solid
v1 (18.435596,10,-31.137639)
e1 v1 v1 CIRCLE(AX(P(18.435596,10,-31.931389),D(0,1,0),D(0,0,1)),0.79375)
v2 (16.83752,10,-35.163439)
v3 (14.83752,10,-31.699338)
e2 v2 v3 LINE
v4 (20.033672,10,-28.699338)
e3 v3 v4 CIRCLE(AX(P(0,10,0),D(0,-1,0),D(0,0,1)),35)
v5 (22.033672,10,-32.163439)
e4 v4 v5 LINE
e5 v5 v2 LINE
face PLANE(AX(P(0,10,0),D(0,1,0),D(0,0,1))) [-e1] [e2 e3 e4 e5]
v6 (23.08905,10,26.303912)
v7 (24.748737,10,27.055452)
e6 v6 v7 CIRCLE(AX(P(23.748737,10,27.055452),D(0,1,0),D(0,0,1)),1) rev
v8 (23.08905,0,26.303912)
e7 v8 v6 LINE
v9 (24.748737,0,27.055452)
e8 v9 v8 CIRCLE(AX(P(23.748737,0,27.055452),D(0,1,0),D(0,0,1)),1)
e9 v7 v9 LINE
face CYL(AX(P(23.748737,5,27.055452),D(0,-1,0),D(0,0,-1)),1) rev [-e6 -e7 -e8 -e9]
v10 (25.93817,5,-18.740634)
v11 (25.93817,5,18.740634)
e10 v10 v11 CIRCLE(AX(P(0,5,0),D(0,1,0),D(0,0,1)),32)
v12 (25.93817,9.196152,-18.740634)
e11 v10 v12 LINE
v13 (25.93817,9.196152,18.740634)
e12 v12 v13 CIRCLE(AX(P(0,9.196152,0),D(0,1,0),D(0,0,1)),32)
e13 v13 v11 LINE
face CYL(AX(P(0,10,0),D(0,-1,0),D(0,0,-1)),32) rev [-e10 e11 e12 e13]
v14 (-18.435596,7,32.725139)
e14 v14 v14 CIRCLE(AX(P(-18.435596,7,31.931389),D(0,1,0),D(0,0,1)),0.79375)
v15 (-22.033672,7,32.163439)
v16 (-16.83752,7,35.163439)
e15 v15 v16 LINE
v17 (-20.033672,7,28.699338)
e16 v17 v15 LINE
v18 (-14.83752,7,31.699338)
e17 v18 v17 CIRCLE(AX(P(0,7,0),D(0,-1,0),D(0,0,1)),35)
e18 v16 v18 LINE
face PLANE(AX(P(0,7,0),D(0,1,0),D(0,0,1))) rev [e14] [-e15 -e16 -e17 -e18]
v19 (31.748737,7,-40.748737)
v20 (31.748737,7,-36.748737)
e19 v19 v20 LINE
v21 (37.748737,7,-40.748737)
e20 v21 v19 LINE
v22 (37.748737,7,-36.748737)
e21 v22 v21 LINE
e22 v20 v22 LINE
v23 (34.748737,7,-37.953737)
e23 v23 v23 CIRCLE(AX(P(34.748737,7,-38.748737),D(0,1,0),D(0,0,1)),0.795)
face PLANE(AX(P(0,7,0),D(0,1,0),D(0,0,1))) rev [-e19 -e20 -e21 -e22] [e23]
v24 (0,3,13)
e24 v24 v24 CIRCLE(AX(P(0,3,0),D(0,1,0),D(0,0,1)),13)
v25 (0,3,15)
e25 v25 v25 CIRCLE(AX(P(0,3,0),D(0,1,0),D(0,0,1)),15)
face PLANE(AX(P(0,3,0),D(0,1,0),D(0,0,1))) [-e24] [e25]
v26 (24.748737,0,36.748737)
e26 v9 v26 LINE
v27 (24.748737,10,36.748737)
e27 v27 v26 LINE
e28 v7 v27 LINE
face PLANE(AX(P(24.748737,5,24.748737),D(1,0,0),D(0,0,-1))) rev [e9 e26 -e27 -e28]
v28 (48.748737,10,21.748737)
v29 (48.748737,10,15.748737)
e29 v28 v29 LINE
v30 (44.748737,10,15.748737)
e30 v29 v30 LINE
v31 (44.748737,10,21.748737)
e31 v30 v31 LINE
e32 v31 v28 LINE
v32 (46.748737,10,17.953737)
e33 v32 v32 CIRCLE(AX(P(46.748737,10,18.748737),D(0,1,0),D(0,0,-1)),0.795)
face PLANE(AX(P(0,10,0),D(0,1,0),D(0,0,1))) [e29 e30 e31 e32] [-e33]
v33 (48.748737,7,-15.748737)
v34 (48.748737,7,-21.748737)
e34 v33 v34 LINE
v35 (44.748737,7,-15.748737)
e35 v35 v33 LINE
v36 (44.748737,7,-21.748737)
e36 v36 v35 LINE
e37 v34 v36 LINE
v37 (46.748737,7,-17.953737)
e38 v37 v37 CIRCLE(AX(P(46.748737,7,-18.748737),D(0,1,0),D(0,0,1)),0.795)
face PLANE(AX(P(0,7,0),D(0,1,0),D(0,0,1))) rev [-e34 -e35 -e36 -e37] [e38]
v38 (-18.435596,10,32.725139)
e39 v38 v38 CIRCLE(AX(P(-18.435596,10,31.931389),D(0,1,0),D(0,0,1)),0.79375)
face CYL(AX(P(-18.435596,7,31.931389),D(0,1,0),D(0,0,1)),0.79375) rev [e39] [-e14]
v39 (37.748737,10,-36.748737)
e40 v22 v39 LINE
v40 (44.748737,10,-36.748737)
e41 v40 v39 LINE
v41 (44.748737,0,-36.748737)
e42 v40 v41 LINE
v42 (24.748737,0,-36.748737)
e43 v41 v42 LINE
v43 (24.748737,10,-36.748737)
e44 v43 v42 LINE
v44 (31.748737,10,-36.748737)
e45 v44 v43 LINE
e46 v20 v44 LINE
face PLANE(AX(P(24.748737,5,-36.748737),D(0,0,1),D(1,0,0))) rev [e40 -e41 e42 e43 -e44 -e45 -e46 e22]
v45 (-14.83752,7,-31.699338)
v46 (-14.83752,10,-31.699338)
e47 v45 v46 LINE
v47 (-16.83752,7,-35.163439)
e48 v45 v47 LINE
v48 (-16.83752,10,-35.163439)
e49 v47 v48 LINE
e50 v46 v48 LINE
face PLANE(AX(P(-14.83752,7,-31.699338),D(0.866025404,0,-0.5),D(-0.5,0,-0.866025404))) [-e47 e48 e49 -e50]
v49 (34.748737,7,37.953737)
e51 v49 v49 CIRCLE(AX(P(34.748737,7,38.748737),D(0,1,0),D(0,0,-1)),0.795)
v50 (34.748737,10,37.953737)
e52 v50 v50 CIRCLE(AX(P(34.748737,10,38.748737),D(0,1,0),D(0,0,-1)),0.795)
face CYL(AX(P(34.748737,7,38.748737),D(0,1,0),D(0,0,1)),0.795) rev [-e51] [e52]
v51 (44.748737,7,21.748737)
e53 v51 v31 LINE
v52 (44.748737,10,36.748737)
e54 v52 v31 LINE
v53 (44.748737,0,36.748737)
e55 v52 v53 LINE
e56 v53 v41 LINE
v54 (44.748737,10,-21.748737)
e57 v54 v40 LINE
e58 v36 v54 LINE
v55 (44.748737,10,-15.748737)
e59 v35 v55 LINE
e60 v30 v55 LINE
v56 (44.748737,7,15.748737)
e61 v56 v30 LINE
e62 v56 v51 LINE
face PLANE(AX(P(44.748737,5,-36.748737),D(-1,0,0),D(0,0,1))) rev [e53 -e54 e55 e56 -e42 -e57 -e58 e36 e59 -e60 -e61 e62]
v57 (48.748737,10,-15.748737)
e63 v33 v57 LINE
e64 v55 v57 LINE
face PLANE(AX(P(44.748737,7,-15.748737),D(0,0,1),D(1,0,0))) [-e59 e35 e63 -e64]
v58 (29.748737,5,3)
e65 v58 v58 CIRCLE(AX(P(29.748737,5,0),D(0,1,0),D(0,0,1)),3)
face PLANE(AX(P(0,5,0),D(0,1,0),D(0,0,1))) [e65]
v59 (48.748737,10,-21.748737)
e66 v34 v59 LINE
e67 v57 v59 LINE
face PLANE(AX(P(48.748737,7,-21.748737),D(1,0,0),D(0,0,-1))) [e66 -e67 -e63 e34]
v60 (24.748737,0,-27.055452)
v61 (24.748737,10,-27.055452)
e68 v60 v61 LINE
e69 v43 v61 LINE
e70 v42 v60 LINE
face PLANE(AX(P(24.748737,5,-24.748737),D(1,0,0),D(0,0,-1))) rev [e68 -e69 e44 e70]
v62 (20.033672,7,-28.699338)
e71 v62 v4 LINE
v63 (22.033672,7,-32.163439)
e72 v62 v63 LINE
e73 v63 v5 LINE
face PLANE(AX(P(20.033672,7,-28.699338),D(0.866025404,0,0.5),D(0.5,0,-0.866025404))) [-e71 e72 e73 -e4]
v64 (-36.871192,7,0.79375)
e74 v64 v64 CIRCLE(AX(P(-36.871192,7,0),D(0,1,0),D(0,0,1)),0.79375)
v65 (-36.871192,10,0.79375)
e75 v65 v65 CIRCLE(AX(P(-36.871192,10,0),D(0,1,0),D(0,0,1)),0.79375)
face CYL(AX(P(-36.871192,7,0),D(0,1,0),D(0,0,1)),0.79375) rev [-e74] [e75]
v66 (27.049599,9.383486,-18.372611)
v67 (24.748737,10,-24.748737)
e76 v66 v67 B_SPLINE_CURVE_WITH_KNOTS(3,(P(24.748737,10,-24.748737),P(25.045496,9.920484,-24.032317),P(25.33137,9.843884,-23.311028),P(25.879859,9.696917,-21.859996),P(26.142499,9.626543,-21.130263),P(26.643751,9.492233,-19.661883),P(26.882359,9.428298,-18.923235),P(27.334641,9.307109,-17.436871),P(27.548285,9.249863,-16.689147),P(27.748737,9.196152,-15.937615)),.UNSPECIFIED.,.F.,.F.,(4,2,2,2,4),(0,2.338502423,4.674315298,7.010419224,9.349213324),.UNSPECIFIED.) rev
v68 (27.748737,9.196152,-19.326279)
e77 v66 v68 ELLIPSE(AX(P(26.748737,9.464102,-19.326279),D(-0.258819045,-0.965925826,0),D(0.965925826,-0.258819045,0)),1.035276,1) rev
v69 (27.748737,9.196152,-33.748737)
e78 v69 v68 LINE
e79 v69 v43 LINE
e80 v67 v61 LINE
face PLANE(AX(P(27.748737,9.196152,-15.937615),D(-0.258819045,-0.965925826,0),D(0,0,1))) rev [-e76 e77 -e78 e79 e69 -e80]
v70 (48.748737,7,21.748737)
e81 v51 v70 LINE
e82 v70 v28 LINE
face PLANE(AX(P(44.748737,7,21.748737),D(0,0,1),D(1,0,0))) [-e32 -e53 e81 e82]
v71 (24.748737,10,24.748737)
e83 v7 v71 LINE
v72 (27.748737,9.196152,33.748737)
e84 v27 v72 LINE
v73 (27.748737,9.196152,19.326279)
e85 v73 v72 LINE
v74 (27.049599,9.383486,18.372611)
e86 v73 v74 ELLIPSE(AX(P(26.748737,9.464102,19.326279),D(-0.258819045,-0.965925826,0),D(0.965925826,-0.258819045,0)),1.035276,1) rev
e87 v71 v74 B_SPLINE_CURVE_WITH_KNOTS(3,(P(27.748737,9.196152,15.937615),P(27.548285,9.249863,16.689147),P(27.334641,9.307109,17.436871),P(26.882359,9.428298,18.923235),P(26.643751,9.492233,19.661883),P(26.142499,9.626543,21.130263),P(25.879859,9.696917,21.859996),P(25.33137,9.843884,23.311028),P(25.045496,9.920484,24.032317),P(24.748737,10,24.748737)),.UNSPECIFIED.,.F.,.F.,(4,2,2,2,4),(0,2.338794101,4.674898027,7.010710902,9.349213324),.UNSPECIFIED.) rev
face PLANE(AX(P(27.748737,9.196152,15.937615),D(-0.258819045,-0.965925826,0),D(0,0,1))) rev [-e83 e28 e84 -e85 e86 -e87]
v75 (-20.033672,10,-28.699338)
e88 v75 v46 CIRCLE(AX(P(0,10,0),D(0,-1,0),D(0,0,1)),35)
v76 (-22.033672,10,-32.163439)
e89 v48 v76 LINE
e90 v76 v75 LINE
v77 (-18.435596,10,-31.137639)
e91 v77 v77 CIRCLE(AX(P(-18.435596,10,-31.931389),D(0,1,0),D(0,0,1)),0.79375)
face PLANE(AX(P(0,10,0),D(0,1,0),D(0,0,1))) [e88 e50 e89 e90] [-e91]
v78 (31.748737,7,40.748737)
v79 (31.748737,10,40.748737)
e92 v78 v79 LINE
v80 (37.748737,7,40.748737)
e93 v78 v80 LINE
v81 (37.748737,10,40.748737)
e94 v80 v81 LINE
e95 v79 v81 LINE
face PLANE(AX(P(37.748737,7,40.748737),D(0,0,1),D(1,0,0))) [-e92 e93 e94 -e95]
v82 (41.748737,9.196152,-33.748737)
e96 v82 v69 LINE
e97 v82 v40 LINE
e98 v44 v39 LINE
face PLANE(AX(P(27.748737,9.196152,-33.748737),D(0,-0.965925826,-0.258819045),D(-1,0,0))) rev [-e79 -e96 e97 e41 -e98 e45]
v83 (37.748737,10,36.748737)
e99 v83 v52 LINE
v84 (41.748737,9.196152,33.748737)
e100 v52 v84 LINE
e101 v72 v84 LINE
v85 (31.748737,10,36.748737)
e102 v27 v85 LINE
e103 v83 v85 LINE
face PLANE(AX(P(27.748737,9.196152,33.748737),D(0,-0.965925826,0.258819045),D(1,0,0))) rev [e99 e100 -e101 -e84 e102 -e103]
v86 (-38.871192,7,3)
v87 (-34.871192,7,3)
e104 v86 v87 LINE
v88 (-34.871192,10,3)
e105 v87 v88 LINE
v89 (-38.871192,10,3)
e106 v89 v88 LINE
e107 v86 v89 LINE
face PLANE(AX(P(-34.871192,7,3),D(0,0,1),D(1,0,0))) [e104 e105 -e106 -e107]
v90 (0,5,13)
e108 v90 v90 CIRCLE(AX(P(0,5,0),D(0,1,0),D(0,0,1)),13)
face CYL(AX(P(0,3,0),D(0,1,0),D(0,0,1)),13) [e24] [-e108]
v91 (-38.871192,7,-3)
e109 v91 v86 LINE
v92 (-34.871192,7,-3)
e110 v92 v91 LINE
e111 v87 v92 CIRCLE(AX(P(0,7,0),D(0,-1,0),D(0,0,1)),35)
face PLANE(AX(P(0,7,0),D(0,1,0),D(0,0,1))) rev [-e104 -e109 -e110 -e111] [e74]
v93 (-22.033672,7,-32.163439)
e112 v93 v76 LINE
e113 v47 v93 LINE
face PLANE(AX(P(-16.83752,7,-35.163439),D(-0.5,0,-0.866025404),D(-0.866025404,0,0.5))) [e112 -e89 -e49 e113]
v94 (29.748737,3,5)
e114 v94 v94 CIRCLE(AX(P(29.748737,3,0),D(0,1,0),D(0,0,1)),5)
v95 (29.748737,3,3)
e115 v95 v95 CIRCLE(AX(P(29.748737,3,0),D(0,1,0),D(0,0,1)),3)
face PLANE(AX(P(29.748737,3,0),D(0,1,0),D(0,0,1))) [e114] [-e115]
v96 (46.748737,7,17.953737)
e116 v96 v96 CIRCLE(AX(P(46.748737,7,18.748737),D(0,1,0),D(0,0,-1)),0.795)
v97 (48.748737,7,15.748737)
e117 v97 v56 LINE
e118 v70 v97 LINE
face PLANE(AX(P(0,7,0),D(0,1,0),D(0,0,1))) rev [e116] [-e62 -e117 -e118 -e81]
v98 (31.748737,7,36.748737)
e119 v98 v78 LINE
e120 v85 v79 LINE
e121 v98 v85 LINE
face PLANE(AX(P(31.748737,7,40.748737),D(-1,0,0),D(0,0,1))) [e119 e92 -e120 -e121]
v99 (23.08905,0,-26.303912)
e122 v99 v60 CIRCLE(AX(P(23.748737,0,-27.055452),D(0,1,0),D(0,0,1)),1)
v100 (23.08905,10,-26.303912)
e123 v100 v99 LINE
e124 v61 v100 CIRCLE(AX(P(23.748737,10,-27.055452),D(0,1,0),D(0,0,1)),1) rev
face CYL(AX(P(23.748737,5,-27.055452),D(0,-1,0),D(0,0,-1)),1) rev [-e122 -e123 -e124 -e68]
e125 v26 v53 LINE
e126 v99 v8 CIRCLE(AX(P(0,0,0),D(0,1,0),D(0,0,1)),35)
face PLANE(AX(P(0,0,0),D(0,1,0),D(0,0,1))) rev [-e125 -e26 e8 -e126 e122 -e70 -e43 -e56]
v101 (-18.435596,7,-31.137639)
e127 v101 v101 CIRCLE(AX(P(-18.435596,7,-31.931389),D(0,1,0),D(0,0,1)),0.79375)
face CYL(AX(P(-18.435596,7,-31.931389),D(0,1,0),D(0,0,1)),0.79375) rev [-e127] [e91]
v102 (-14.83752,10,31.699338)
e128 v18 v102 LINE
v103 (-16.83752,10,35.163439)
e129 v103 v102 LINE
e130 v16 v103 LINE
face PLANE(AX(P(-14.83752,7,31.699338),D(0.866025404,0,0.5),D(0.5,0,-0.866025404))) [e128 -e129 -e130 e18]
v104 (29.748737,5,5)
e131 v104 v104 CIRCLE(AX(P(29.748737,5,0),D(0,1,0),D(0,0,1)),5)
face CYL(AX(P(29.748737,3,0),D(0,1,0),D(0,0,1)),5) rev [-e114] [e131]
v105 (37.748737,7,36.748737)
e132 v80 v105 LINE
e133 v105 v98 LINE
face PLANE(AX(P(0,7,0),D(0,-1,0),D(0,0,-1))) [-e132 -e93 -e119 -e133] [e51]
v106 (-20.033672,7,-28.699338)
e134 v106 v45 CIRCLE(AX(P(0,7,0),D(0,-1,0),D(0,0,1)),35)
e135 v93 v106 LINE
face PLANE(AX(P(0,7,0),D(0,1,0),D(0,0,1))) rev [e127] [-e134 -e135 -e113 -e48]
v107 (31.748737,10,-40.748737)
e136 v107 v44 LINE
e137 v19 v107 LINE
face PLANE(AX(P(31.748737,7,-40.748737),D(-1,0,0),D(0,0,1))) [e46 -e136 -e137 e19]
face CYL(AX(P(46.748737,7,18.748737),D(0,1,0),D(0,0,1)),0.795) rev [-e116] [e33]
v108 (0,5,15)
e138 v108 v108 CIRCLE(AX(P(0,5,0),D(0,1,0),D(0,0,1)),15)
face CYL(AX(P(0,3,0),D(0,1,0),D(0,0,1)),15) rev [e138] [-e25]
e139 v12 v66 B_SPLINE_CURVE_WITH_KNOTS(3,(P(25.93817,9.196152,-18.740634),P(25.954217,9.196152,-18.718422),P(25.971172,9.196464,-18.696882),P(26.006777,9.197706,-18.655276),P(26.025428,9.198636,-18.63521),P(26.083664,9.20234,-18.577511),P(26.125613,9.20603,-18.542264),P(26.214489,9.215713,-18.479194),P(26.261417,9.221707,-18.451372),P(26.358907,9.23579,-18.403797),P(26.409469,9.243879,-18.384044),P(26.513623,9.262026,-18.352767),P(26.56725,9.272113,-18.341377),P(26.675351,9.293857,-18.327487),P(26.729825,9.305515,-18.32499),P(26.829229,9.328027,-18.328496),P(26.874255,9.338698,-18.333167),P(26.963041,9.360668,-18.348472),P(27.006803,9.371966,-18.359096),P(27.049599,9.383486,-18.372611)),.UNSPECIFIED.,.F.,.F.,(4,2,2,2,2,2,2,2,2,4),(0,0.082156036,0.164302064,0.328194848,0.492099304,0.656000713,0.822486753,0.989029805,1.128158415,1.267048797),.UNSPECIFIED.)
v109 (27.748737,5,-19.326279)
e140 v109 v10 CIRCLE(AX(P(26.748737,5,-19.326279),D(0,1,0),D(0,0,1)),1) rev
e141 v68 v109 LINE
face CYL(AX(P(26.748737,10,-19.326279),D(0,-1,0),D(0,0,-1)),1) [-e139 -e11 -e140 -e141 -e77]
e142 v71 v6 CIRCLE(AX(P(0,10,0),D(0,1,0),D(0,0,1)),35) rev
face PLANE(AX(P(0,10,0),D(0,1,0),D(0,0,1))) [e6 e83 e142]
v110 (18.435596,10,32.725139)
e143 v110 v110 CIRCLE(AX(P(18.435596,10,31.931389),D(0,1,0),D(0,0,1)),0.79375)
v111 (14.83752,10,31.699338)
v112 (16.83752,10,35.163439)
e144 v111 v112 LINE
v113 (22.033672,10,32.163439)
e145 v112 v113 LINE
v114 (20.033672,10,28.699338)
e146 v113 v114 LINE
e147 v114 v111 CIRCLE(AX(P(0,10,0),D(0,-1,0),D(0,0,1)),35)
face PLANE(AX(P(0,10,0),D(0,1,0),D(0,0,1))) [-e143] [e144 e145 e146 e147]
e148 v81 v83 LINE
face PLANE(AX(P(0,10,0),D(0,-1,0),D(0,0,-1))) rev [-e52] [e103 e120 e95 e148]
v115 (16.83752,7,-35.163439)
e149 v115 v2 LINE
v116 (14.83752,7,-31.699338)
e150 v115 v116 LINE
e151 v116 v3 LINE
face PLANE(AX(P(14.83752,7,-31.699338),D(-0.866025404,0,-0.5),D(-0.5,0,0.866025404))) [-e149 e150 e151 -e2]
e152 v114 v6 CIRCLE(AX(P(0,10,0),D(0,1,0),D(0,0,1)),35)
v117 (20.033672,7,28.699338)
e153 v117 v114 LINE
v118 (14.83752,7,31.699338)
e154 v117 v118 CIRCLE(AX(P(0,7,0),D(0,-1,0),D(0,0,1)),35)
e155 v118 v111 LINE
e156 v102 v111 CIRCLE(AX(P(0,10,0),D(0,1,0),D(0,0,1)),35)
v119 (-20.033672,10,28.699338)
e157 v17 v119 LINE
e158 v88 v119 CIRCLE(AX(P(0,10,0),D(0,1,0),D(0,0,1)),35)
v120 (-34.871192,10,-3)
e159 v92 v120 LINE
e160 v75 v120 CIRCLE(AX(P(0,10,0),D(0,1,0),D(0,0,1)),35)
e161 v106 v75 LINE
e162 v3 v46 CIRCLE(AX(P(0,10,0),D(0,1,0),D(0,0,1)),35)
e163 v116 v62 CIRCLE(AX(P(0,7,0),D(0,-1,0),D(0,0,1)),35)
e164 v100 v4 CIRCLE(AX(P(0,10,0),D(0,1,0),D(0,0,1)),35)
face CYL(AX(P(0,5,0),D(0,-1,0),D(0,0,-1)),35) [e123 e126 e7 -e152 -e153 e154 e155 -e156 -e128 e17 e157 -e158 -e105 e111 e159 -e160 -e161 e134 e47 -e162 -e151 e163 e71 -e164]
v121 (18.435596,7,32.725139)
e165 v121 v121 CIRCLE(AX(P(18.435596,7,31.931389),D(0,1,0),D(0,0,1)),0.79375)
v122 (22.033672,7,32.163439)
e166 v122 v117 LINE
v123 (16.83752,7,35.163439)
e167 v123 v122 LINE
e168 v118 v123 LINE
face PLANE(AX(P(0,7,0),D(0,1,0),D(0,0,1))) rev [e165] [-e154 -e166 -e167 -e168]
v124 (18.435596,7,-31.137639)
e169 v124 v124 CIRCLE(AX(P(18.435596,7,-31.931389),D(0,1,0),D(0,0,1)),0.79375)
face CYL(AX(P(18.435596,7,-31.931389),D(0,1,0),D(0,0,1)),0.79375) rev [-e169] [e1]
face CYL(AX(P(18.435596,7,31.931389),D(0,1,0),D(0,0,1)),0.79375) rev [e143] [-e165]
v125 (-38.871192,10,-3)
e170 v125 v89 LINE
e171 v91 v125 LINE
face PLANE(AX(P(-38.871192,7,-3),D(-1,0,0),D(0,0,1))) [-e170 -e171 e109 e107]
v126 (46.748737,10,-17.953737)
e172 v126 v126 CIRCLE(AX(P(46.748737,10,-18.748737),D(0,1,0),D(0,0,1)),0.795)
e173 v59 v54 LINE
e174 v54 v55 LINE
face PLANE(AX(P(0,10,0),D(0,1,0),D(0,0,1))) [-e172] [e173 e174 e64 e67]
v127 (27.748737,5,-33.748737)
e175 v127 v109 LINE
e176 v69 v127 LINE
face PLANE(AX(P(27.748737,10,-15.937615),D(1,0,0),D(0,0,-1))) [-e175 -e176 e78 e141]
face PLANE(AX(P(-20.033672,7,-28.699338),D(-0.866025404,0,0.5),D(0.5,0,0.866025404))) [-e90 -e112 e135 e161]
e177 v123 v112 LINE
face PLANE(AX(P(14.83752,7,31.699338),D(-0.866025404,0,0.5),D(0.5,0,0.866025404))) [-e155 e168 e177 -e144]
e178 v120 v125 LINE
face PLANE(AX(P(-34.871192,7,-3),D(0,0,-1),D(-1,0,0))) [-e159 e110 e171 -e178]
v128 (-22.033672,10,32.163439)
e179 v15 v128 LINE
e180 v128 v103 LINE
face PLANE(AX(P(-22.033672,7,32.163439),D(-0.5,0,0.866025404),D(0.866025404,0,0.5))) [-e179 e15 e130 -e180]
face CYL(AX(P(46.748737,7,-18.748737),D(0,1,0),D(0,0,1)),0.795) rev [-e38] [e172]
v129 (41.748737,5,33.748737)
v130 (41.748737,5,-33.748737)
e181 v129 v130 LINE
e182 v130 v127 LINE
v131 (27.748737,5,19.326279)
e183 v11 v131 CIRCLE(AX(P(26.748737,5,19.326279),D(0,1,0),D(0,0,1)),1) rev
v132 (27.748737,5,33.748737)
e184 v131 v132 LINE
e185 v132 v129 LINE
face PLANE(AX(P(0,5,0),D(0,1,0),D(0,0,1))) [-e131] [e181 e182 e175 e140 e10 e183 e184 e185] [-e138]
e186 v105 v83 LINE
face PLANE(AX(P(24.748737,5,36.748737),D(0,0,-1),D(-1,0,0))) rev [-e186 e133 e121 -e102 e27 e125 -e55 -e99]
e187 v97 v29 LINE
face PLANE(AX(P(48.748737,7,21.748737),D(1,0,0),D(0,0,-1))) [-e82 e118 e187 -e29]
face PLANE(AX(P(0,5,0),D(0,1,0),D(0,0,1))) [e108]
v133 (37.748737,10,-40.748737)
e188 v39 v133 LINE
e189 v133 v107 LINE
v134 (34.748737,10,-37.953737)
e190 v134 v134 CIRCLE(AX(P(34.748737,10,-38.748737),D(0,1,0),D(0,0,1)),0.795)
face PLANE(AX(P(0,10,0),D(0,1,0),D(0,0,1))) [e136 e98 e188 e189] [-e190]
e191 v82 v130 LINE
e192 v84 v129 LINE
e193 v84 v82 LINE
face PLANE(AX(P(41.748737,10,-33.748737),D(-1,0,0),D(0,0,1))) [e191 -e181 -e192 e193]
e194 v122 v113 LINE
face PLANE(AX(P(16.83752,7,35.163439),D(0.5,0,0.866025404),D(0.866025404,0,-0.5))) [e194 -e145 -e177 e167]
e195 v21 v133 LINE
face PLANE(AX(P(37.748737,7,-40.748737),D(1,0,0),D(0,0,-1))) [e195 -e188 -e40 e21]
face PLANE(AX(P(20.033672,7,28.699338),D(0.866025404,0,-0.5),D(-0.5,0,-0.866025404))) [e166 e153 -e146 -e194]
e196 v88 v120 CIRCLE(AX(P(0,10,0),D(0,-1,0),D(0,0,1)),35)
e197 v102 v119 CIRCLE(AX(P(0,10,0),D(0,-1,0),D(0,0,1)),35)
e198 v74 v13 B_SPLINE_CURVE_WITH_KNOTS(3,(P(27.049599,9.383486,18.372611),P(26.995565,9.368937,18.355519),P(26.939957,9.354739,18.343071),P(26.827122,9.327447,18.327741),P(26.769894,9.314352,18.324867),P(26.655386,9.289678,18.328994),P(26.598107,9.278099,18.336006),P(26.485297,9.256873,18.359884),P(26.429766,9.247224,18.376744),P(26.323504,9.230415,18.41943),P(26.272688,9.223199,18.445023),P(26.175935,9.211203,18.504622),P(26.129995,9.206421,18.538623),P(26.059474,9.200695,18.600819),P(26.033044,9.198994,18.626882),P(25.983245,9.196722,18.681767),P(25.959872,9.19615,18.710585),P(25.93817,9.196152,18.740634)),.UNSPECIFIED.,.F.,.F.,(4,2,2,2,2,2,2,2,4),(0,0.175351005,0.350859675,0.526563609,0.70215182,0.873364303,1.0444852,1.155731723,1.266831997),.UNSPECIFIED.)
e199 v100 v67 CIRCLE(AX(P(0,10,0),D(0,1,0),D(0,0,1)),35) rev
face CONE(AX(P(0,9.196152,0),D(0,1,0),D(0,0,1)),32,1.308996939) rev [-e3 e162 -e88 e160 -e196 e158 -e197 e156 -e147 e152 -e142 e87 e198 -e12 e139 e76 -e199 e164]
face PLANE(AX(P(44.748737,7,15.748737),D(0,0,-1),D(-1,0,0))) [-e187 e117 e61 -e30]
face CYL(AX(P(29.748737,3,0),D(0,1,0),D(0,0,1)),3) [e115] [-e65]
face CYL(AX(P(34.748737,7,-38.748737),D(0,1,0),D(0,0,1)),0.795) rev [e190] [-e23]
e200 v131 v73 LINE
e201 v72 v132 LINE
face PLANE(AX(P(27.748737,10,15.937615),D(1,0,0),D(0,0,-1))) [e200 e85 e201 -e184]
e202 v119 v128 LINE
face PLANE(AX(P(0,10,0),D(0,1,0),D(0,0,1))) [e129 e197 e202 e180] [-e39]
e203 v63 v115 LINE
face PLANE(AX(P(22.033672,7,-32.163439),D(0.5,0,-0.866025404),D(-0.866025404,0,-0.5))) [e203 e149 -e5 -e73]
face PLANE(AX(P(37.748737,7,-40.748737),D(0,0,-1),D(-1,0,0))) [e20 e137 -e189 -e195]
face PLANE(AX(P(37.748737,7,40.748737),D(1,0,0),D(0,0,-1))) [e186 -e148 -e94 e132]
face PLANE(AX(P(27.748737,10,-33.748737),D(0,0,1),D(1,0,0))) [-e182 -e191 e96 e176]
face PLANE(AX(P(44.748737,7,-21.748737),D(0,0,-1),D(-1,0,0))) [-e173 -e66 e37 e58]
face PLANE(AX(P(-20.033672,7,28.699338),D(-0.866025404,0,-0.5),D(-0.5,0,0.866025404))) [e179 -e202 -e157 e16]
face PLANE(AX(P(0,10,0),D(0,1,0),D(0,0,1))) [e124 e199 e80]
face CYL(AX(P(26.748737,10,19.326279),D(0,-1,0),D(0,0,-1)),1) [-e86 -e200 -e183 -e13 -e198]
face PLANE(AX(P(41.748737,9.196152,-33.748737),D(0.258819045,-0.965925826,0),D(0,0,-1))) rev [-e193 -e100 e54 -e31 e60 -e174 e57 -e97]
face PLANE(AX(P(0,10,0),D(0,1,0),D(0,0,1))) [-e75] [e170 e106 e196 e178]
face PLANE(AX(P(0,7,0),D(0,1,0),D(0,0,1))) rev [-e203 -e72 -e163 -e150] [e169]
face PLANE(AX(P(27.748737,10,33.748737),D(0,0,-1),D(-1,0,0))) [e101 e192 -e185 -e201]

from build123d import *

# Parameters (mm, degrees)
SKETCH1_R           = 15
BOSS_EXTRUDE1_DEPTH = 5
BOSS_EXTRUDE2_DEPTH = 5
FILLET2_R           = 1
CHAMFER12_SIZE      = 3
CHAMFER12_SIZE_2    = 0.803847577
BOSS_EXTRUDE3_START = -3
SKETCH5_R           = 0.79375
SKETCH5_W           = 6
SKETCH5_H           = 4
SKETCH5_R_2         = 0.795
SKETCH5_W_2         = 4
SKETCH5_H_2         = 6
BOSS_EXTRUDE3_DEPTH = 3
FILLET3_R           = 1
BOSS_EXTRUDE4_START = -5
SKETCH6_R           = 15
BOSS_EXTRUDE4_DEPTH = 5
SKETCH7_R           = 15
SKETCH7_R_2         = 13
SKETCH7_R_3         = 5
SKETCH7_R_4         = 3
CUT_EXTRUDE1_DEPTH  = 2


with BuildPart() as part:
    # Sketch1 → Boss-Extrude1 (new body)
    with BuildSketch(Plane(origin=(0, 0, 0), x_dir=(1, 0, 0), z_dir=(0, 1, 0))):
        with BuildLine():
            Line((24.748737342, 24.748737342), (24.748737342, 36.748737342))
            Line((24.748737342, 36.748737342), (44.748737342, 36.748737342))
            Line((44.748737342, 36.748737342), (44.748737342, -36.748737342))
            Line((44.748737342, -36.748737342), (24.748737342, -36.748737342))
            Line((24.748737342, -36.748737342), (24.748737342, -24.748737342))
            ThreePointArc((24.748737342, -24.748737342), (-35, 0), (24.748737342, 24.748737342))
        make_face()
        with Locations(Location((0, 0, 0), (0, 0, 270))):
            Circle(SKETCH1_R, mode=Mode.SUBTRACT)
    extrude(amount=BOSS_EXTRUDE1_DEPTH)

    # Sketch2 → Boss-Extrude2 (add)
    with BuildSketch(Plane(origin=(0, 5, 0), x_dir=(1, 0, 0), z_dir=(0, 1, 0))):
        with BuildLine():
            Line((24.748737342, 24.748737342), (24.748737342, 36.748737342))
            Line((24.748737342, 36.748737342), (44.748737342, 36.748737342))
            Line((44.748737342, 36.748737342), (44.748737342, -36.748737342))
            Line((44.748737342, -36.748737342), (24.748737342, -36.748737342))
            Line((24.748737342, -36.748737342), (24.748737342, -24.748737342))
            ThreePointArc((24.748737342, -24.748737342), (-35, 0), (24.748737342, 24.748737342))
        make_face()
        with BuildLine():
            Line((27.748737342, -15.937615127), (27.748737342, -33.748737342))
            Line((27.748737342, -33.748737342), (41.748737342, -33.748737342))
            Line((41.748737342, -33.748737342), (41.748737342, 33.748737342))
            Line((41.748737342, 33.748737342), (27.748737342, 33.748737342))
            Line((27.748737342, 33.748737342), (27.748737342, 15.937615127))
            ThreePointArc((27.748737342, 15.937615127), (-32, 0), (27.748737342, -15.937615127))
        make_face(mode=Mode.SUBTRACT)
    extrude(amount=BOSS_EXTRUDE2_DEPTH)

    # Fillet2
    fillet2_edges = [part.edges().sort_by_distance(p)[0] for p in [
        (24.748737342, 5, -24.748737342),
        (24.748737342, 5, 24.748737342),
    ]]
    fillet(fillet2_edges, radius=FILLET2_R)

    # Chamfer12
    # the kernel refuses this chamfer: 3, 0.803847577 mm, written as the material it takes off along each edge
    with BuildSketch(Plane(origin=(0, 10, 0), x_dir=(0.9619307815124764, 0, -0.27329319709571387), z_dir=(0.27329319709571387, 0, 0.9619307815124764))) as chamfer12_piece_1:
        Polygon((32 + CHAMFER12_SIZE, 0), (32, -CHAMFER12_SIZE_2), (32, 0), align=None)
    revolve(axis=Axis((0, 10, 0), (0, 1, 0)), revolution_arc=328.279348711, mode=Mode.SUBTRACT)
    with BuildSketch(Plane(origin=(27.748737342, 10, 8.147450417), x_dir=(-1, 0, 0), z_dir=(0, 0, 1)), Plane(origin=(27.748737342, 10, -33.748737342), x_dir=(-1, 0, 0), z_dir=(0, 0, 1))) as chamfer12_piece_2:
        Polygon((CHAMFER12_SIZE, 0), (0, CHAMFER12_SIZE_2), (0, 0), align=None)
    extrude(amount=25.601286925, mode=Mode.SUBTRACT)
    with BuildSketch(Plane(origin=(27.748737342, 10, 33.748737342), x_dir=(0, 0, 1), z_dir=(1, 0, 0)), Plane(origin=(41.748737342, 10, -33.748737342), x_dir=(0, 0, -1), z_dir=(-1, 0, 0))) as chamfer12_piece_3:
        Polygon((CHAMFER12_SIZE, 0), (0, CHAMFER12_SIZE_2), (0, 0), align=None)
    extrude(amount=14, mode=Mode.SUBTRACT)
    with BuildSketch(Plane(origin=(41.748737342, 10, 33.748737342), x_dir=(1, 0, 0), z_dir=(0, 0, -1))) as chamfer12_piece_4:
        Polygon((CHAMFER12_SIZE, 0), (0, CHAMFER12_SIZE_2), (0, 0), align=None)
    extrude(amount=67.497474683, mode=Mode.SUBTRACT)
    with BuildSketch(Plane(origin=(27.748737342, 10, 8.147450417), x_dir=(-1, 0, 0), z_dir=(0, 0, 1))) as chamfer12_piece_5a_section:
        Polygon((CHAMFER12_SIZE, 0), (0, CHAMFER12_SIZE_2), (0, 0), align=None)
    chamfer12_piece_5a = extrude(amount=33.391451635, mode=Mode.PRIVATE)
    chamfer12_piece_5a = split(chamfer12_piece_5a, bisect_by=Plane(origin=(27.748737342, 10, 36.748737342), z_dir=(0, 0, -1)), keep=Keep.TOP, mode=Mode.PRIVATE)
    chamfer12_piece_5a = split(chamfer12_piece_5a, bisect_by=Plane(origin=(27.748737342, 10, 33.748737342), z_dir=(0, 0, 1)), keep=Keep.TOP, mode=Mode.PRIVATE)
    with BuildSketch(Plane(origin=(19.958572631, 10, 33.748737342), x_dir=(0, 0, 1), z_dir=(1, 0, 0))) as chamfer12_piece_5b_section:
        Polygon((CHAMFER12_SIZE, 0), (0, CHAMFER12_SIZE_2), (0, 0), align=None)
    chamfer12_piece_5b = extrude(amount=21.790164711, mode=Mode.PRIVATE)
    chamfer12_piece_5b = split(chamfer12_piece_5b, bisect_by=Plane(origin=(24.748737342, 10, 33.748737342), z_dir=(1, 0, 0)), keep=Keep.TOP, mode=Mode.PRIVATE)
    chamfer12_piece_5b = split(chamfer12_piece_5b, bisect_by=Plane(origin=(27.748737342, 10, 33.748737342), z_dir=(-1, 0, 0)), keep=Keep.TOP, mode=Mode.PRIVATE)
    chamfer12_piece_5 = chamfer12_piece_5a & chamfer12_piece_5b
    add(chamfer12_piece_5, mode=Mode.SUBTRACT)
    with BuildSketch(Plane(origin=(27.748737342, 10, 33.748737342), x_dir=(0, 0, 1), z_dir=(1, 0, 0))) as chamfer12_piece_6a_section:
        Polygon((CHAMFER12_SIZE, 0), (0, CHAMFER12_SIZE_2), (0, 0), align=None)
    chamfer12_piece_6a = extrude(amount=21.790164711, mode=Mode.PRIVATE)
    chamfer12_piece_6a = split(chamfer12_piece_6a, bisect_by=Plane(origin=(44.748737342, 10, 33.748737342), z_dir=(-1, 0, 0)), keep=Keep.TOP, mode=Mode.PRIVATE)
    chamfer12_piece_6a = split(chamfer12_piece_6a, bisect_by=Plane(origin=(41.748737342, 10, 33.748737342), z_dir=(1, 0, 0)), keep=Keep.TOP, mode=Mode.PRIVATE)
    with BuildSketch(Plane(origin=(41.748737342, 10, 41.538902052), x_dir=(1, 0, 0), z_dir=(0, 0, -1))) as chamfer12_piece_6b_section:
        Polygon((CHAMFER12_SIZE, 0), (0, CHAMFER12_SIZE_2), (0, 0), align=None)
    chamfer12_piece_6b = extrude(amount=75.287639394, mode=Mode.PRIVATE)
    chamfer12_piece_6b = split(chamfer12_piece_6b, bisect_by=Plane(origin=(41.748737342, 10, 36.748737342), z_dir=(0, 0, -1)), keep=Keep.TOP, mode=Mode.PRIVATE)
    chamfer12_piece_6b = split(chamfer12_piece_6b, bisect_by=Plane(origin=(41.748737342, 10, 33.748737342), z_dir=(0, 0, 1)), keep=Keep.TOP, mode=Mode.PRIVATE)
    chamfer12_piece_6 = chamfer12_piece_6a & chamfer12_piece_6b
    add(chamfer12_piece_6, mode=Mode.SUBTRACT)
    with BuildSketch(Plane(origin=(41.748737342, 10, 33.748737342), x_dir=(1, 0, 0), z_dir=(0, 0, -1))) as chamfer12_piece_7a_section:
        Polygon((CHAMFER12_SIZE, 0), (0, CHAMFER12_SIZE_2), (0, 0), align=None)
    chamfer12_piece_7a = extrude(amount=75.287639394, mode=Mode.PRIVATE)
    chamfer12_piece_7a = split(chamfer12_piece_7a, bisect_by=Plane(origin=(41.748737342, 10, -36.748737342), z_dir=(0, 0, 1)), keep=Keep.TOP, mode=Mode.PRIVATE)
    chamfer12_piece_7a = split(chamfer12_piece_7a, bisect_by=Plane(origin=(41.748737342, 10, -33.748737342), z_dir=(0, 0, -1)), keep=Keep.TOP, mode=Mode.PRIVATE)
    with BuildSketch(Plane(origin=(49.538902052, 10, -33.748737342), x_dir=(0, 0, -1), z_dir=(-1, 0, 0))) as chamfer12_piece_7b_section:
        Polygon((CHAMFER12_SIZE, 0), (0, CHAMFER12_SIZE_2), (0, 0), align=None)
    chamfer12_piece_7b = extrude(amount=21.790164711, mode=Mode.PRIVATE)
    chamfer12_piece_7b = split(chamfer12_piece_7b, bisect_by=Plane(origin=(44.748737342, 10, -33.748737342), z_dir=(-1, 0, 0)), keep=Keep.TOP, mode=Mode.PRIVATE)
    chamfer12_piece_7b = split(chamfer12_piece_7b, bisect_by=Plane(origin=(41.748737342, 10, -33.748737342), z_dir=(1, 0, 0)), keep=Keep.TOP, mode=Mode.PRIVATE)
    chamfer12_piece_7 = chamfer12_piece_7a & chamfer12_piece_7b
    add(chamfer12_piece_7, mode=Mode.SUBTRACT)
    with BuildSketch(Plane(origin=(41.748737342, 10, -33.748737342), x_dir=(0, 0, -1), z_dir=(-1, 0, 0))) as chamfer12_piece_8a_section:
        Polygon((CHAMFER12_SIZE, 0), (0, CHAMFER12_SIZE_2), (0, 0), align=None)
    chamfer12_piece_8a = extrude(amount=21.790164711, mode=Mode.PRIVATE)
    chamfer12_piece_8a = split(chamfer12_piece_8a, bisect_by=Plane(origin=(24.748737342, 10, -33.748737342), z_dir=(1, 0, 0)), keep=Keep.TOP, mode=Mode.PRIVATE)
    chamfer12_piece_8a = split(chamfer12_piece_8a, bisect_by=Plane(origin=(27.748737342, 10, -33.748737342), z_dir=(-1, 0, 0)), keep=Keep.TOP, mode=Mode.PRIVATE)
    with BuildSketch(Plane(origin=(27.748737342, 10, -41.538902052), x_dir=(-1, 0, 0), z_dir=(0, 0, 1))) as chamfer12_piece_8b_section:
        Polygon((CHAMFER12_SIZE, 0), (0, CHAMFER12_SIZE_2), (0, 0), align=None)
    chamfer12_piece_8b = extrude(amount=33.391451635, mode=Mode.PRIVATE)
    chamfer12_piece_8b = split(chamfer12_piece_8b, bisect_by=Plane(origin=(27.748737342, 10, -36.748737342), z_dir=(0, 0, 1)), keep=Keep.TOP, mode=Mode.PRIVATE)
    chamfer12_piece_8b = split(chamfer12_piece_8b, bisect_by=Plane(origin=(27.748737342, 10, -33.748737342), z_dir=(0, 0, -1)), keep=Keep.TOP, mode=Mode.PRIVATE)
    chamfer12_piece_8 = chamfer12_piece_8a & chamfer12_piece_8b
    add(chamfer12_piece_8, mode=Mode.SUBTRACT)

    # Sketch5 → Boss-Extrude3 (add)
    # profile 1 of 9: a face of its own
    with BuildSketch(Plane(origin=(0, 10, 0), x_dir=(1, 0, 0), z_dir=(0, 1, 0)).offset(BOSS_EXTRUDE3_START)):
        with BuildLine():
            Line((-34.871191548, 3), (-38.871191548, 3))
            Line((-38.871191548, 3), (-38.871191548, -3))
            Line((-38.871191548, -3), (-34.871191548, -3))
            ThreePointArc((-34.871191548, -3), (-35, 0), (-34.871191548, 3))
        make_face()
        with Locations(Location((-36.871191548, 0, 0), (0, 0, 270))):
            Circle(SKETCH5_R, mode=Mode.SUBTRACT)
    # profile 2 of 9: a face of its own
    with BuildSketch(Plane(origin=(0, 10, 0), x_dir=(1, 0, 0), z_dir=(0, 1, 0)).offset(BOSS_EXTRUDE3_START)):
        with BuildLine():
            Line((-14.837519563, 31.699337741), (-16.837519563, 35.163439356))
            Line((-16.837519563, 35.163439356), (-22.033671986, 32.163439356))
            Line((-22.033671986, 32.163439356), (-20.033671986, 28.699337741))
            ThreePointArc((-20.033671986, 28.699337741), (-17.5, 30.310889132), (-14.837519563, 31.699337741))
        make_face()
        with Locations(Location((-18.435595774, 31.931388549, 0), (0, 0, 270))):
            Circle(SKETCH5_R, mode=Mode.SUBTRACT)
    # profile 3 of 9: a face of its own
    with BuildSketch(Plane(origin=(0, 10, 0), x_dir=(1, 0, 0), z_dir=(0, 1, 0)).offset(BOSS_EXTRUDE3_START)):
        with BuildLine():
            Line((20.033671986, 28.699337741), (22.033671986, 32.163439356))
            Line((22.033671986, 32.163439356), (16.837519563, 35.163439356))
            Line((16.837519563, 35.163439356), (14.837519563, 31.699337741))
            ThreePointArc((14.837519563, 31.699337741), (17.5, 30.310889132), (20.033671986, 28.699337741))
        make_face()
        with Locations(Location((18.435595774, 31.931388549, 0), (0, 0, 270))):
            Circle(SKETCH5_R, mode=Mode.SUBTRACT)
    # profile 4 of 9: a face of its own
    with BuildSketch(Plane(origin=(0, 10, 0), x_dir=(1, 0, 0), z_dir=(0, 1, 0)).offset(BOSS_EXTRUDE3_START)):
        with BuildLine():
            Line((14.837519563, -31.699337741), (16.837519563, -35.163439356))
            Line((16.837519563, -35.163439356), (22.033671986, -32.163439356))
            Line((22.033671986, -32.163439356), (20.033671986, -28.699337741))
            ThreePointArc((20.033671986, -28.699337741), (17.5, -30.310889132), (14.837519563, -31.699337741))
        make_face()
        with Locations(Location((18.435595774, -31.931388549, 0), (0, 0, 270))):
            Circle(SKETCH5_R, mode=Mode.SUBTRACT)
    # profile 5 of 9: a face of its own
    with BuildSketch(Plane(origin=(0, 10, 0), x_dir=(1, 0, 0), z_dir=(0, 1, 0)).offset(BOSS_EXTRUDE3_START)):
        with BuildLine():
            Line((-20.033671986, -28.699337741), (-22.033671986, -32.163439356))
            Line((-22.033671986, -32.163439356), (-16.837519563, -35.163439356))
            Line((-16.837519563, -35.163439356), (-14.837519563, -31.699337741))
            ThreePointArc((-14.837519563, -31.699337741), (-17.5, -30.310889132), (-20.033671986, -28.699337741))
        make_face()
        with Locations(Location((-18.435595774, -31.931388549, 0), (0, 0, 270))):
            Circle(SKETCH5_R, mode=Mode.SUBTRACT)
    # profile 6 of 9: a face of its own
    with BuildSketch(Plane(origin=(0, 10, 0), x_dir=(1, 0, 0), z_dir=(0, 1, 0)).offset(BOSS_EXTRUDE3_START)):
        with Locations((34.748737342, 38.748737342)):
            Rectangle(SKETCH5_W, SKETCH5_H)
        with Locations(Location((34.748737342, 38.748737342, 0), (0, 0, 270))):
            Circle(SKETCH5_R_2, mode=Mode.SUBTRACT)
    # profile 7 of 9: a face of its own
    with BuildSketch(Plane(origin=(0, 10, 0), x_dir=(1, 0, 0), z_dir=(0, 1, 0)).offset(BOSS_EXTRUDE3_START)):
        with Locations((46.748737342, 18.748737342)):
            Rectangle(SKETCH5_W_2, SKETCH5_H_2)
        with Locations(Location((46.748737342, 18.748737342, 0), (0, 0, 270))):
            Circle(SKETCH5_R_2, mode=Mode.SUBTRACT)
    # profile 8 of 9: a face of its own
    with BuildSketch(Plane(origin=(0, 10, 0), x_dir=(1, 0, 0), z_dir=(0, 1, 0)).offset(BOSS_EXTRUDE3_START)):
        with Locations((46.748737342, -18.748737342)):
            Rectangle(SKETCH5_W_2, SKETCH5_H_2)
        with Locations(Location((46.748737342, -18.748737342, 0), (0, 0, 90))):
            Circle(SKETCH5_R_2, mode=Mode.SUBTRACT)
    # profile 9 of 9: a face of its own
    with BuildSketch(Plane(origin=(0, 10, 0), x_dir=(1, 0, 0), z_dir=(0, 1, 0)).offset(BOSS_EXTRUDE3_START)):
        with Locations((34.748737342, -38.748737342)):
            Rectangle(SKETCH5_W, SKETCH5_H)
        with Locations(Location((34.748737342, -38.748737342, 0), (0, 0, 90))):
            Circle(SKETCH5_R_2, mode=Mode.SUBTRACT)
    extrude(amount=BOSS_EXTRUDE3_DEPTH)

    # Fillet3
    fillet3_edges = [part.edges().sort_by_distance(p)[0] for p in [
        (27.748737342, 7.098076212, 15.937615127),
        (27.748737342, 7.098076212, -15.937615127),
    ]]
    fillet(fillet3_edges, radius=FILLET3_R)

    # Sketch6 → Boss-Extrude4 (add)
    with BuildSketch(Plane(origin=(0, 5, 0), x_dir=(1, 0, 0), z_dir=(0, 1, 0)).offset(BOSS_EXTRUDE4_START)):
        Circle(SKETCH6_R)
    extrude(amount=BOSS_EXTRUDE4_DEPTH)

    # Sketch7 → Cut-Extrude1 (cut)
    # profile 1 of 2: a face of its own
    with BuildSketch(Plane(origin=(0, 5, 0), x_dir=(1, 0, 0), z_dir=(0, 1, 0))):
        with Locations(Location((0, 0, 0), (0, 0, 270))):
            Circle(SKETCH7_R)
        with Locations(Location((0, 0, 0), (0, 0, 270))):
            Circle(SKETCH7_R_2, mode=Mode.SUBTRACT)
    # profile 2 of 2: a face of its own
    with BuildSketch(Plane(origin=(0, 5, 0), x_dir=(1, 0, 0), z_dir=(0, 1, 0))):
        with Locations(Location((29.748737342, 0, 0), (0, 0, 270))):
            Circle(SKETCH7_R_3)
        with Locations(Location((29.748737342, 0, 0), (0, 0, 270))):
            Circle(SKETCH7_R_4, mode=Mode.SUBTRACT)
    extrude(amount=-CUT_EXTRUDE1_DEPTH, mode=Mode.SUBTRACT)


solid = part.part
